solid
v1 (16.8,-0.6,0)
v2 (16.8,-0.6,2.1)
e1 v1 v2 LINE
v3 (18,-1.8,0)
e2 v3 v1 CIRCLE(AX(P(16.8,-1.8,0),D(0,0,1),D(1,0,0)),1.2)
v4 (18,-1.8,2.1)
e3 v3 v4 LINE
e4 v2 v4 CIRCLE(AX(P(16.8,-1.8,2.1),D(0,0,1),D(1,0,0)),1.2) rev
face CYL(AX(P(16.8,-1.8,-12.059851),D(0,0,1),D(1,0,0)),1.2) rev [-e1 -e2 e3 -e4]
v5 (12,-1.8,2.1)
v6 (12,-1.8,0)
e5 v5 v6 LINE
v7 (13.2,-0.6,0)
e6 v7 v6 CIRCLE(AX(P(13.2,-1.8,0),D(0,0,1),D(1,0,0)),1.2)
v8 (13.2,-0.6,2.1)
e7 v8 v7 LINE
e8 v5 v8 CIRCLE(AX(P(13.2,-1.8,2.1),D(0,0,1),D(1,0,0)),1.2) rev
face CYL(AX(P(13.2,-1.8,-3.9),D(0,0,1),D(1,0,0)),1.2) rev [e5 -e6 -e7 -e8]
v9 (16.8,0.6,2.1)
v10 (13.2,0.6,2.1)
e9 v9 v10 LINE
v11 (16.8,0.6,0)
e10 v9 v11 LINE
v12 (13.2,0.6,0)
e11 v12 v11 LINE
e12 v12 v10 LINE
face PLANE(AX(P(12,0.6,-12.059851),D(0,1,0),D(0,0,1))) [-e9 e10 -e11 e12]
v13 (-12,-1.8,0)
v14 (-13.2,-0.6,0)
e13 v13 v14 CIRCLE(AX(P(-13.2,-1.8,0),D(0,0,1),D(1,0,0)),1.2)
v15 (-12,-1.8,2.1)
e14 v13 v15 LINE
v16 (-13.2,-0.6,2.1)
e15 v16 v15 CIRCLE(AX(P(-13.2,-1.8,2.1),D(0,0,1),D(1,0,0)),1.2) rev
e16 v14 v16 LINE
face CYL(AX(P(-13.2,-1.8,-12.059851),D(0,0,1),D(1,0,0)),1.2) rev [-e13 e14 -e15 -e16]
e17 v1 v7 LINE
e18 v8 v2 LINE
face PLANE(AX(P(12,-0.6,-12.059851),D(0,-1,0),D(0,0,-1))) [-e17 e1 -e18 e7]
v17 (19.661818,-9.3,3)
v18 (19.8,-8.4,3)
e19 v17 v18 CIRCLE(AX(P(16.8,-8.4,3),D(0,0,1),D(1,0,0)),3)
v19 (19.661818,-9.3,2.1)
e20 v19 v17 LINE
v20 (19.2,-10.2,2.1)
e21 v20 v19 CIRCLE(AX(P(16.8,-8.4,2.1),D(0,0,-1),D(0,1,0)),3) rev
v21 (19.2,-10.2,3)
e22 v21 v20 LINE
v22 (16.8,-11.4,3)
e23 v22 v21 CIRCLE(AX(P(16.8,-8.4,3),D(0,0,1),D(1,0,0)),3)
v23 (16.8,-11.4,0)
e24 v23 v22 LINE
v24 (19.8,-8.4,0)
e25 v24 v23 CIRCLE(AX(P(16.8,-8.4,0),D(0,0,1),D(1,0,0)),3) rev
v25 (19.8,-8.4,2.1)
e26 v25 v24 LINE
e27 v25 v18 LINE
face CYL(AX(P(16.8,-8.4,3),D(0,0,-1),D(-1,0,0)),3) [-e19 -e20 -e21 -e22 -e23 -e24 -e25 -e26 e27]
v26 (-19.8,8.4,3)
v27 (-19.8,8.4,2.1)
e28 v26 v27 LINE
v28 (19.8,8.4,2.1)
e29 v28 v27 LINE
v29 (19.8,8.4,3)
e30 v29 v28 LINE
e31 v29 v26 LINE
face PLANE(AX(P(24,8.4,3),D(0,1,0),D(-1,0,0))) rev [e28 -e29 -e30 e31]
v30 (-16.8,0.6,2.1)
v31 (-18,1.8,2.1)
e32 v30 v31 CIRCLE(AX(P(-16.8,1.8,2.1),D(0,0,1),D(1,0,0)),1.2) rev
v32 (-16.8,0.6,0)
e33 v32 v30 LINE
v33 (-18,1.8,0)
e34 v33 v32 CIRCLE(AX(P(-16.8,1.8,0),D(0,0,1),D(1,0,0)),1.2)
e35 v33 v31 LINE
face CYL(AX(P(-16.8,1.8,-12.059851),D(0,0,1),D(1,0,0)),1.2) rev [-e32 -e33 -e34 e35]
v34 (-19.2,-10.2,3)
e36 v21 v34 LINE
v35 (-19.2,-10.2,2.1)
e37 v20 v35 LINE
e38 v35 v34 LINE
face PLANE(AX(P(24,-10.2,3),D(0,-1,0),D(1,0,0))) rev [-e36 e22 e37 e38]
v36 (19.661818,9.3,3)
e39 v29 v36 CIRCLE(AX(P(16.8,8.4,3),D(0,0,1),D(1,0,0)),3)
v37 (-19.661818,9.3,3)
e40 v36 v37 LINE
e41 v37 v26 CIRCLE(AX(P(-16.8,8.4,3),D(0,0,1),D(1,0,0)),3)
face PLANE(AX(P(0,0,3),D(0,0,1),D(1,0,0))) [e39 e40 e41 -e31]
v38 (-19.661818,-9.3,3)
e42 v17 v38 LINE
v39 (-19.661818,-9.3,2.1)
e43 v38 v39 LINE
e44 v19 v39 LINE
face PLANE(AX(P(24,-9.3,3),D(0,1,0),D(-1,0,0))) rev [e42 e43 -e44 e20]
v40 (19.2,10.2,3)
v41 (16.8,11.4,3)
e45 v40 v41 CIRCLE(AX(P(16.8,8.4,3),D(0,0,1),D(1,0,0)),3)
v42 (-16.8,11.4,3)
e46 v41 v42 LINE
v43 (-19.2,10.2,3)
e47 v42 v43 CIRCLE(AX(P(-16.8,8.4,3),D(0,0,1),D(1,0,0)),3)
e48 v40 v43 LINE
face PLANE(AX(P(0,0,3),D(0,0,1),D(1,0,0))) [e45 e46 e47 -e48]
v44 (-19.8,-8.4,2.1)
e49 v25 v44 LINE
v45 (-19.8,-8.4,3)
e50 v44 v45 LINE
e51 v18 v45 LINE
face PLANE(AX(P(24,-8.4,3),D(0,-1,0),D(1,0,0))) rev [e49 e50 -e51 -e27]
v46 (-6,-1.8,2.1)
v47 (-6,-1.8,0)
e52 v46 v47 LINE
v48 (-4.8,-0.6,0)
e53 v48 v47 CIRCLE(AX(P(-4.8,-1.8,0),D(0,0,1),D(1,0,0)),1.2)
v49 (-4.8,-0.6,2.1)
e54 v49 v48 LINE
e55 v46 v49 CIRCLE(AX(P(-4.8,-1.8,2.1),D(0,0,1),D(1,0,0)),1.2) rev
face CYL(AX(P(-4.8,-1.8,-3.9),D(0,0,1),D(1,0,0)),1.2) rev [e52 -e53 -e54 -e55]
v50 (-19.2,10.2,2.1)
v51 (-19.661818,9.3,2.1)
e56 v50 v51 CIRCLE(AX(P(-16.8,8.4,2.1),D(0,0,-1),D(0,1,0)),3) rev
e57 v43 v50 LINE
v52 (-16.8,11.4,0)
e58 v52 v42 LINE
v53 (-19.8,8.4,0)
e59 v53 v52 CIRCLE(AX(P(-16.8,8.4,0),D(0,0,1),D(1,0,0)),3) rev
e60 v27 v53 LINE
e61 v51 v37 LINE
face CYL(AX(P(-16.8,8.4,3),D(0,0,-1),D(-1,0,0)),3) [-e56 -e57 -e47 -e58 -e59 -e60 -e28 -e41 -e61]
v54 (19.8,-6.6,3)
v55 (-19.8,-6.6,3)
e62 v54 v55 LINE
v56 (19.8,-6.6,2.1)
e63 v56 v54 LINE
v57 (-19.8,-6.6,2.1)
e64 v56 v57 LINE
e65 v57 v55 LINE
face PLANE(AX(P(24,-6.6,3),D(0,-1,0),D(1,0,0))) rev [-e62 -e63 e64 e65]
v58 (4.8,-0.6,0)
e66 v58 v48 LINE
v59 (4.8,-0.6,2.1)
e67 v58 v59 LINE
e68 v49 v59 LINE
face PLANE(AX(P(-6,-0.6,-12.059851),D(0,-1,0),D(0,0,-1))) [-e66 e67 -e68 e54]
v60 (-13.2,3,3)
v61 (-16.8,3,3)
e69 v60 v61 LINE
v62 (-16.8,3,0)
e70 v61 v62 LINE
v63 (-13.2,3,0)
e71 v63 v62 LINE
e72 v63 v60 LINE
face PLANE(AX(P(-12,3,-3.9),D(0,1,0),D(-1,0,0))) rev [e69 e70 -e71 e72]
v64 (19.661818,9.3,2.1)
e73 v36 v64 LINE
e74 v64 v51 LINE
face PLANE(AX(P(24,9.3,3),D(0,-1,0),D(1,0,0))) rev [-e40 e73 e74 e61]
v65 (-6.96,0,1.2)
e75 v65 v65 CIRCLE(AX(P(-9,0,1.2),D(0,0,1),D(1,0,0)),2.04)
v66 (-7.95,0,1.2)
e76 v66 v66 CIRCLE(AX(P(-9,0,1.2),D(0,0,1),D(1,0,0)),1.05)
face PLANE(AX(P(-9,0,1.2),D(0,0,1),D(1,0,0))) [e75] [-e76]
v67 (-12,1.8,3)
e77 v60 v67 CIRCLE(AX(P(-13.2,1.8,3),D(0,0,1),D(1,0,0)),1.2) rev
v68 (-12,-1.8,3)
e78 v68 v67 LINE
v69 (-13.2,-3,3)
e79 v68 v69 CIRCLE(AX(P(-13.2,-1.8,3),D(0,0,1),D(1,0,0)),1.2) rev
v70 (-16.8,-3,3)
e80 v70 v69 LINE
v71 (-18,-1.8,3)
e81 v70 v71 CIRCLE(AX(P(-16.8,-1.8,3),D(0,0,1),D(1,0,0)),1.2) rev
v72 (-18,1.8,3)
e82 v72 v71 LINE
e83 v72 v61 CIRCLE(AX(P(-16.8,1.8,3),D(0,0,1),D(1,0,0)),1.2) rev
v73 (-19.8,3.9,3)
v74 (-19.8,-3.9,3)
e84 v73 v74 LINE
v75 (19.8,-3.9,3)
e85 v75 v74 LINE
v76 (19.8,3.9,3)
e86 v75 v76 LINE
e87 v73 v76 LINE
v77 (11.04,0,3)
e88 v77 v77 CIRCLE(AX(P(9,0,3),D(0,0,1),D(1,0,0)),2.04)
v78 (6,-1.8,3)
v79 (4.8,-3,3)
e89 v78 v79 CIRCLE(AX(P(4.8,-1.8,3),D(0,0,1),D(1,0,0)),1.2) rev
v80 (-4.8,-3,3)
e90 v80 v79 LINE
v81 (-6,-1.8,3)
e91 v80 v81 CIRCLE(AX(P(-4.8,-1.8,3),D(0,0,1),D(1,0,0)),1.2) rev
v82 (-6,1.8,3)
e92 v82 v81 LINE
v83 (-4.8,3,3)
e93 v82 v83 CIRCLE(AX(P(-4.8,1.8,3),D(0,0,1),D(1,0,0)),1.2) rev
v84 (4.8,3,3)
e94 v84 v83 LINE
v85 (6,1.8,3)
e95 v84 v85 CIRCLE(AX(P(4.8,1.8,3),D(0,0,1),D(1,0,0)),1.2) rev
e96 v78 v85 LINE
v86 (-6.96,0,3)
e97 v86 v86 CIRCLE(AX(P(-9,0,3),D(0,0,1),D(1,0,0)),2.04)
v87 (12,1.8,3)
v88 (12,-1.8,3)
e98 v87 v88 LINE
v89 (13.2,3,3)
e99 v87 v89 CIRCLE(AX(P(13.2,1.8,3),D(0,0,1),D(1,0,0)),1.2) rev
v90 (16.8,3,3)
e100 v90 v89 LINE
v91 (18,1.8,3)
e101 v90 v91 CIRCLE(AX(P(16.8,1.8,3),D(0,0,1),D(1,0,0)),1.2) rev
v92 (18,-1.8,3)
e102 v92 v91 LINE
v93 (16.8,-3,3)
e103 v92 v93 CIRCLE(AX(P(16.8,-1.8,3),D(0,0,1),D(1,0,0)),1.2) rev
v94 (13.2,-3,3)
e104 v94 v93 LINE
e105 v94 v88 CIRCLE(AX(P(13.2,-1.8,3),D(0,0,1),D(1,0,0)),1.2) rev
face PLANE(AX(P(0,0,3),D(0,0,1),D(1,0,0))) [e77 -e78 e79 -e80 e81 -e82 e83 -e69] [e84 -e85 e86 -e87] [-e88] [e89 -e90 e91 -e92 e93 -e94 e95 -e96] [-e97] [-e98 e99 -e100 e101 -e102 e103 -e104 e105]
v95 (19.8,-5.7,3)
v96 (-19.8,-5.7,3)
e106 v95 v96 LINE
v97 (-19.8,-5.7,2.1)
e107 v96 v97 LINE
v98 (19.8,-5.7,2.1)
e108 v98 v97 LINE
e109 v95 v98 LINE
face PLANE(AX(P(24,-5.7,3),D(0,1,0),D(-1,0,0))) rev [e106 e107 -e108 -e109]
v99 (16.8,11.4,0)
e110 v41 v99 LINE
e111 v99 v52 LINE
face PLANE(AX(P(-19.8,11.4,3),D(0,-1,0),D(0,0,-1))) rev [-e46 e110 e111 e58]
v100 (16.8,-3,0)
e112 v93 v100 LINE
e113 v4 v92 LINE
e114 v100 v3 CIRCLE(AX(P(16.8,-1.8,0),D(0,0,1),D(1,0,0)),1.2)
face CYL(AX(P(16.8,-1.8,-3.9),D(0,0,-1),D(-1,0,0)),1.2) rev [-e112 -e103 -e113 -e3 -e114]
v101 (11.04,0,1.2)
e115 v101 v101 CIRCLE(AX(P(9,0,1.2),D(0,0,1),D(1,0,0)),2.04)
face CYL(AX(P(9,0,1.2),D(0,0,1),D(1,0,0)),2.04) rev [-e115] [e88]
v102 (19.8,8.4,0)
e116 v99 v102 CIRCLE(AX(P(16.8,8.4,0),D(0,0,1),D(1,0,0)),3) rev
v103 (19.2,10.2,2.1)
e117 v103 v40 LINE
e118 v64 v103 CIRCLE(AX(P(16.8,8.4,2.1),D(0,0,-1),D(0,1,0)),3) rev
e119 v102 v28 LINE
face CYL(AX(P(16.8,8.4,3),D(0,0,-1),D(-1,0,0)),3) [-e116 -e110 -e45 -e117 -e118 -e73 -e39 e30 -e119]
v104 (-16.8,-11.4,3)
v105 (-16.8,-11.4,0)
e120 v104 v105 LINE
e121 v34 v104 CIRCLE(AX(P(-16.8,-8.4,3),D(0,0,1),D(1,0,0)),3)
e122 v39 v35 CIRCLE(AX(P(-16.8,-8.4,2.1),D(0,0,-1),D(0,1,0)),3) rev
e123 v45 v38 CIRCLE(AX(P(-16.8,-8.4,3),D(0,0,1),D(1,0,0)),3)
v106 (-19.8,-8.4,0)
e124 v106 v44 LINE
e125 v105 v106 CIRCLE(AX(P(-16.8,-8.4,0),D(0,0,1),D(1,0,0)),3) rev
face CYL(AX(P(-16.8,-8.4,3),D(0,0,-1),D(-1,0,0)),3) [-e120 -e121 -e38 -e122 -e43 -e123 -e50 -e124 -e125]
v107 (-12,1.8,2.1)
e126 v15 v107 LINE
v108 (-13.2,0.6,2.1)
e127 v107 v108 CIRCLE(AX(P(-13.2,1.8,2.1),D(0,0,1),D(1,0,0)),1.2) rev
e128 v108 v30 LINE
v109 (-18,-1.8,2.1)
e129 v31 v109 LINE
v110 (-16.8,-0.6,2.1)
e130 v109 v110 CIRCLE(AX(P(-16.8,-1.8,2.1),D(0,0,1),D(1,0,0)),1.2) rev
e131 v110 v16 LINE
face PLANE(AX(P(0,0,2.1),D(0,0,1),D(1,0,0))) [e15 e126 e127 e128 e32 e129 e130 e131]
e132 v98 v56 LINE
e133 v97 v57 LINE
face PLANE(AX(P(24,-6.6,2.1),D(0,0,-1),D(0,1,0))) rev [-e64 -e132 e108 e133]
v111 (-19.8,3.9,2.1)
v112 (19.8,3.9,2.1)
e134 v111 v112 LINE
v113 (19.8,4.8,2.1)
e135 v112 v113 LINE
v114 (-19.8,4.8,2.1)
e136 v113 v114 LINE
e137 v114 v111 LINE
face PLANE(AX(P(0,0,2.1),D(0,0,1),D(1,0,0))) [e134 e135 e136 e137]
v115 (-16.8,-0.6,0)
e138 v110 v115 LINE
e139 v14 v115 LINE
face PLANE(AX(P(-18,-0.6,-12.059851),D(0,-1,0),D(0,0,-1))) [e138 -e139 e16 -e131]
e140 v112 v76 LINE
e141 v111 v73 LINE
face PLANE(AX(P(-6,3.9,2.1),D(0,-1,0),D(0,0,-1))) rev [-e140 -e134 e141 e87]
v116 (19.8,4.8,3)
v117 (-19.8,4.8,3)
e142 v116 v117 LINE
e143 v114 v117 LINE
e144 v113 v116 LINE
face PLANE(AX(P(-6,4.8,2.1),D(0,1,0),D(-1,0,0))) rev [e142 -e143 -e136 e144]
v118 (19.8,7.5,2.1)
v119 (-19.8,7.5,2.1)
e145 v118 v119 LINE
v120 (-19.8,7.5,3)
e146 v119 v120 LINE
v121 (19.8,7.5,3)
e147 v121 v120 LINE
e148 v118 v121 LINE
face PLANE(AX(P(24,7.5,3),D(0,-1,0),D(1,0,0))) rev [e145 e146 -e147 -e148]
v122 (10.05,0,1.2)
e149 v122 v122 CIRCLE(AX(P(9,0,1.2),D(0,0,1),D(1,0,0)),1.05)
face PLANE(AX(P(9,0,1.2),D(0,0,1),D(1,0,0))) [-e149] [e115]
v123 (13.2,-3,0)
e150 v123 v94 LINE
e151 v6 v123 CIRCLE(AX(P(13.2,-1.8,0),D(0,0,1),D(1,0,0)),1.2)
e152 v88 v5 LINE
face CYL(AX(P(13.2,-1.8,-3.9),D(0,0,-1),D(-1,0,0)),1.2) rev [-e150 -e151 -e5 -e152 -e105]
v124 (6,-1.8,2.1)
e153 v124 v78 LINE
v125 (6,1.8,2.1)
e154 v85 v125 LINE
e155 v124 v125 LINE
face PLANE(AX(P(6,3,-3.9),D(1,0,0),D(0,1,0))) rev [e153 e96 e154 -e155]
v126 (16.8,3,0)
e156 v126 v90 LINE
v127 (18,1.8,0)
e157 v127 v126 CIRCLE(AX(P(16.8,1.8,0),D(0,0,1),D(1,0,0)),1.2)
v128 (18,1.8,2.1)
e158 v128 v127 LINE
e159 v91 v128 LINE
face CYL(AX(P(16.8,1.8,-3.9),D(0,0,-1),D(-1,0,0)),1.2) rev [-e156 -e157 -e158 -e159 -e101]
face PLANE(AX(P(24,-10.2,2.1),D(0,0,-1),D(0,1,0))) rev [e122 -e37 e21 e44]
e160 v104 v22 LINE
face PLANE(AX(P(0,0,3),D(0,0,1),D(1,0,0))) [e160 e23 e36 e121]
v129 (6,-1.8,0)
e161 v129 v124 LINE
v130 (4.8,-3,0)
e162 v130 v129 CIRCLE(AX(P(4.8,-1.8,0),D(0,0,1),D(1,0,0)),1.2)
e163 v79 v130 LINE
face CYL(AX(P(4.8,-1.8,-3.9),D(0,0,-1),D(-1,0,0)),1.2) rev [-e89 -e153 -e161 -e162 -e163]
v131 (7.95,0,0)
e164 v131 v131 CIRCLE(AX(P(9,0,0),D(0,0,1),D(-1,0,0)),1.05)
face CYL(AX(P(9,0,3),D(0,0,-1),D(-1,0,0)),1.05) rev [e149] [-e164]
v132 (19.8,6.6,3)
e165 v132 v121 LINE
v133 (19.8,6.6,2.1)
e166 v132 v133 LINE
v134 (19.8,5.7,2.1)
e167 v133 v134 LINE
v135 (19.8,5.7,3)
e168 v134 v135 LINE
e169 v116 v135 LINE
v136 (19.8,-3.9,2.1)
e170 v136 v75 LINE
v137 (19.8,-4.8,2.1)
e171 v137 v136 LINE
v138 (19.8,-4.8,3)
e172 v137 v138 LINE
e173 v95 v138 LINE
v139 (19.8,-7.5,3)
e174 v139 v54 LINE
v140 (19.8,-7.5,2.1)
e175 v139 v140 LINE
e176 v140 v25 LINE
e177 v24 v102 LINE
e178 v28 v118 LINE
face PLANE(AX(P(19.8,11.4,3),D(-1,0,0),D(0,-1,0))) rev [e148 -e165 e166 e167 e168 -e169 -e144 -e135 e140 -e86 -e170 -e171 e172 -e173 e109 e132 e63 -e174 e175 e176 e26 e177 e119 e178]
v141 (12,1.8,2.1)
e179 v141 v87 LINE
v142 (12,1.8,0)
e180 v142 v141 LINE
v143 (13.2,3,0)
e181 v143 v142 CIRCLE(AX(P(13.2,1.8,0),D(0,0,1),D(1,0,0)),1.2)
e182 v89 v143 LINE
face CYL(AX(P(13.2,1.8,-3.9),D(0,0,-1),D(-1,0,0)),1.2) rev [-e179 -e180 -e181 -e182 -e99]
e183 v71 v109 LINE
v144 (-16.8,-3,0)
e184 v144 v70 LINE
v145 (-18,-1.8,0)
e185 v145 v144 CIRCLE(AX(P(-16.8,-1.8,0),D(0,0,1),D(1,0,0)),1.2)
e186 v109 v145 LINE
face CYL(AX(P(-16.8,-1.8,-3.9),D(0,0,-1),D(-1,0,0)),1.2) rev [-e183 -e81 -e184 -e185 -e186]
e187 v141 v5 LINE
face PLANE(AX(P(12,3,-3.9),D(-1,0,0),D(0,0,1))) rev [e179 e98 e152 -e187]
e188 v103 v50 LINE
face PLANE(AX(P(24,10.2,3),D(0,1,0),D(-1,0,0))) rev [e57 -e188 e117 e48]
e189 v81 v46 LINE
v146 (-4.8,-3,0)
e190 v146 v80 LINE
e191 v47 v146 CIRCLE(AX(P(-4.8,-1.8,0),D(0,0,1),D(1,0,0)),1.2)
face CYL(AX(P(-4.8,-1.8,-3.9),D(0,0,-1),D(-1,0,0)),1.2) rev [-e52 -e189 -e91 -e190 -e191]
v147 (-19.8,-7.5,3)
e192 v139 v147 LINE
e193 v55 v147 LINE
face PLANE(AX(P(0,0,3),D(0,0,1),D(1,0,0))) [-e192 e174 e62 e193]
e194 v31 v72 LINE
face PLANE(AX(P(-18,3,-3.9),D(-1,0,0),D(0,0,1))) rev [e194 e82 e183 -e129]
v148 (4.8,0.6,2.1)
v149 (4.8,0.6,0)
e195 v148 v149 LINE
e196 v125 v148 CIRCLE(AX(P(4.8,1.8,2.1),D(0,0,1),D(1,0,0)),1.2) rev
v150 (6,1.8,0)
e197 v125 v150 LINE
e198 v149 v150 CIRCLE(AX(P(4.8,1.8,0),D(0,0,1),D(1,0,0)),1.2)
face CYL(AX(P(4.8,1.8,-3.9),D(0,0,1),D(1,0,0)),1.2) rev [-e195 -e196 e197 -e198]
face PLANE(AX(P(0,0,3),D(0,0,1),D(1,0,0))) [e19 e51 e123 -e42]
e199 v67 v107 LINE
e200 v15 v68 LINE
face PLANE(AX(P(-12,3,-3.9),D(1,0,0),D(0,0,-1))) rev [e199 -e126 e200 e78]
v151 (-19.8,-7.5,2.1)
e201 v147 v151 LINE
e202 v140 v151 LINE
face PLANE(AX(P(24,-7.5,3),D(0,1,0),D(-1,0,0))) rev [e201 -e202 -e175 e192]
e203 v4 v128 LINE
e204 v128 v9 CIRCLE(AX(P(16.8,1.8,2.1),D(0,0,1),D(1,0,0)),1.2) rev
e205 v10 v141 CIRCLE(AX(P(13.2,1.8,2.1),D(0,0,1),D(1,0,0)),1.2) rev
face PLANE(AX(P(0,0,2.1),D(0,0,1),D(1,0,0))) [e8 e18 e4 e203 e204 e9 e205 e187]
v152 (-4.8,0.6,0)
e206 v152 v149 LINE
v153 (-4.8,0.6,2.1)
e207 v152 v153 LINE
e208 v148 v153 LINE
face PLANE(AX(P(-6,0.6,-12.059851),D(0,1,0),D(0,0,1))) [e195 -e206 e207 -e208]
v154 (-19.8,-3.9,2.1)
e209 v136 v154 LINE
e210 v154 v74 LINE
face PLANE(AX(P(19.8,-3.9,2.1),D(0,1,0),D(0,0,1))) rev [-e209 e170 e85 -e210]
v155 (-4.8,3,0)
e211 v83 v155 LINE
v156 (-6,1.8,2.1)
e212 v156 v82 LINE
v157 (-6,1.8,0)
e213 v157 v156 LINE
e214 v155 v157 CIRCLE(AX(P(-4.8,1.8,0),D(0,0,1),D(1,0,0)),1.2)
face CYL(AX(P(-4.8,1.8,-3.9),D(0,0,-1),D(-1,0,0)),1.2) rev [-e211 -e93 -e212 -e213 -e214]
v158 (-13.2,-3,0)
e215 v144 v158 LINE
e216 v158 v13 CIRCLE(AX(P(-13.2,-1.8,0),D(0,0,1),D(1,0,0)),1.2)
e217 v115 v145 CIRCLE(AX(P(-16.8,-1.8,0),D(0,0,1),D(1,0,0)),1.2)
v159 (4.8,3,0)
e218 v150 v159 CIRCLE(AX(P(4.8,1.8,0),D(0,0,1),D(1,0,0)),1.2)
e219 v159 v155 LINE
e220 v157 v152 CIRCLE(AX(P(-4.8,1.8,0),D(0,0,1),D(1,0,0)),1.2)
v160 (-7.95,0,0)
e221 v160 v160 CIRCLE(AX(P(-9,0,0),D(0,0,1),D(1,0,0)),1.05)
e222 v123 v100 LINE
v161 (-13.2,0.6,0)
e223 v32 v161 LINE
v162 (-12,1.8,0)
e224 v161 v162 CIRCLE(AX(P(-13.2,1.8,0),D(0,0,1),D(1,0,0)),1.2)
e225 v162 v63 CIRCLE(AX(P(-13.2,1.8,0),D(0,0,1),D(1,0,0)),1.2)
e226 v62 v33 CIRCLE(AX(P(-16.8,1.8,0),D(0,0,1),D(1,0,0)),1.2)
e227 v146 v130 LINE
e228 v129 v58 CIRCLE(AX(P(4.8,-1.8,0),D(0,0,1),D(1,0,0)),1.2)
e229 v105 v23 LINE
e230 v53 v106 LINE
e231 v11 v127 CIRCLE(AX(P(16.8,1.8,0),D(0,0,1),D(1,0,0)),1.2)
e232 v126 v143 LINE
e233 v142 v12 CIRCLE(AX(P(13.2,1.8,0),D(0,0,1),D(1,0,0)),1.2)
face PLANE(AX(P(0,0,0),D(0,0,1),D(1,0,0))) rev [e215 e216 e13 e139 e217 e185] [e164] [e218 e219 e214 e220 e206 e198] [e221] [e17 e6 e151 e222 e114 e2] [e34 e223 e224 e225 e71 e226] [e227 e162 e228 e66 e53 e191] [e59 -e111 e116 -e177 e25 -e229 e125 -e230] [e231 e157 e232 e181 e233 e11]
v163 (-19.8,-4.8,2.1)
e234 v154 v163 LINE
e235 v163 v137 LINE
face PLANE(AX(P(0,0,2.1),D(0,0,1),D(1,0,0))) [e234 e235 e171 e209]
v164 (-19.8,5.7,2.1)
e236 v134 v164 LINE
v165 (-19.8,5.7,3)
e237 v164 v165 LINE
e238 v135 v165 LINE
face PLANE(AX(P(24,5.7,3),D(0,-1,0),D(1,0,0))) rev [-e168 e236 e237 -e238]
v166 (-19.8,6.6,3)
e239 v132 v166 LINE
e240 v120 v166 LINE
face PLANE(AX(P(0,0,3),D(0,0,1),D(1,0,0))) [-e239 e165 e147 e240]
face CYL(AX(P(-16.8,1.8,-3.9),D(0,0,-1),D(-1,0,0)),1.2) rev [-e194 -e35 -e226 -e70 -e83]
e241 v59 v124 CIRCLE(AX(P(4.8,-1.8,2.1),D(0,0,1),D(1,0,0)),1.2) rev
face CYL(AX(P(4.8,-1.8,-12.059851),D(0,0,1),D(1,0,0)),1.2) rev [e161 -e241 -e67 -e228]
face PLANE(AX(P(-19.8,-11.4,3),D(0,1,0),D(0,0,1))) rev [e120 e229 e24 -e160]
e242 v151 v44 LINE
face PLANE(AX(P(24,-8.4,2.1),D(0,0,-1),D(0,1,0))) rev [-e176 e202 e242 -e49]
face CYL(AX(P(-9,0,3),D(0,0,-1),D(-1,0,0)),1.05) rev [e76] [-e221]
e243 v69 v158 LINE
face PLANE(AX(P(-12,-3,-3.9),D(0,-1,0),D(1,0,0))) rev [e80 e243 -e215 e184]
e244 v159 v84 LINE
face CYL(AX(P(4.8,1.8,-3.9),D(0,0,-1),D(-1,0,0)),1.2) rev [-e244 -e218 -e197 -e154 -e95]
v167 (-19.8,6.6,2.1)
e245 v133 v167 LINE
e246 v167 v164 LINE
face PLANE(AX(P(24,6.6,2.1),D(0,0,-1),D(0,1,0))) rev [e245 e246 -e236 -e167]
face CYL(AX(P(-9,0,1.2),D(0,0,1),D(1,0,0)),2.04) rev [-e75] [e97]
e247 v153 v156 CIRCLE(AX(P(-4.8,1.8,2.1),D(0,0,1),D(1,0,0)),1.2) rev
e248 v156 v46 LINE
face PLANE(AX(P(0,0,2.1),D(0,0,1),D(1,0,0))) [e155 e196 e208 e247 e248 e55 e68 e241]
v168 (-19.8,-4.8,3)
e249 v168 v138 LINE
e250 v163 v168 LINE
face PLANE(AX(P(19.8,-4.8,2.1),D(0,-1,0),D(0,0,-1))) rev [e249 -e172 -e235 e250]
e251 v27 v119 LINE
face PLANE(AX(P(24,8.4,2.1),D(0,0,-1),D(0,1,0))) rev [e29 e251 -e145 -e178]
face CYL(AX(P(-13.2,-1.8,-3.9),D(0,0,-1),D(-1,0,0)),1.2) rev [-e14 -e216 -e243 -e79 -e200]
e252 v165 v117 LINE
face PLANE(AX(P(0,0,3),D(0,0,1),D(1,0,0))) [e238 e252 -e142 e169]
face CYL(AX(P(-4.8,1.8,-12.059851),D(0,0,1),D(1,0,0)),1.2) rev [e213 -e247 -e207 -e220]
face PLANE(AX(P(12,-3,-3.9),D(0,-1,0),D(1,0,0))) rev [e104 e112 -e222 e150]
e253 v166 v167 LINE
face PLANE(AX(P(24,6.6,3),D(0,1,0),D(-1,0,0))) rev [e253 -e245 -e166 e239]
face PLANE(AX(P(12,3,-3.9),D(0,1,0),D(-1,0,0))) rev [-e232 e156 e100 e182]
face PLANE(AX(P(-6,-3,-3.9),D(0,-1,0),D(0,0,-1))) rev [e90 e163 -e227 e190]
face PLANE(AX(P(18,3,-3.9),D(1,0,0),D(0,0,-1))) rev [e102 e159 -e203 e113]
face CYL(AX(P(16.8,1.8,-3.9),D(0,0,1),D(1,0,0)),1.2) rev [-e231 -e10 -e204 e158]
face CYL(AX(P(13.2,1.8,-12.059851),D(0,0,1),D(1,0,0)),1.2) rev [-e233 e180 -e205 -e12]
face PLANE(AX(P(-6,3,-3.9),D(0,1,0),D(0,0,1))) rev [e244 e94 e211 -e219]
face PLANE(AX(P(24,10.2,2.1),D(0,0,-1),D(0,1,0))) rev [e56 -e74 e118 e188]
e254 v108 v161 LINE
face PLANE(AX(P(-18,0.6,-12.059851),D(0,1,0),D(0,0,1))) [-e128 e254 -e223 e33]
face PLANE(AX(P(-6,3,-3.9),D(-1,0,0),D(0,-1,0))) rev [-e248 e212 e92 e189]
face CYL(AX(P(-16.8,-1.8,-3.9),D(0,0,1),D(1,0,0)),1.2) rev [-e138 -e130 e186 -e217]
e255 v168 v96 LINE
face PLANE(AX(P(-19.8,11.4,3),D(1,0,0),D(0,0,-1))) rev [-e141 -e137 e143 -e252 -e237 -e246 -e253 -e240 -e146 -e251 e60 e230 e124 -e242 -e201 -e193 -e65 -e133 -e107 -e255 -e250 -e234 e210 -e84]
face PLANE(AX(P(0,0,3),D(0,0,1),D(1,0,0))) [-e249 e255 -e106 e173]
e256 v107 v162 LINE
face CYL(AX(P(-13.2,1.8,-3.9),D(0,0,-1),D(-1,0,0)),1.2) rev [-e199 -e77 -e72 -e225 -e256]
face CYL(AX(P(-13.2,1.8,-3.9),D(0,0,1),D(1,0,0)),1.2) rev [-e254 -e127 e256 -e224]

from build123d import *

# Parameters (mm, degrees)
SKETCH_1_W          = 66
SKETCH_1_H          = 38
SKETCH_1_R          = 1.75
EXTRUDE_1_DEPTH     = 5
SKETCH_2_R          = 3.4
CUT_EXTRUDE_1_DEPTH = 3
SKETCH_3_W          = 1.5
SKETCH_3_H          = 1.5
CUT_EXTRUDE_2_DEPTH = 73
SKETCH_4_W          = 10
SKETCH_4_H          = 1.5
SKETCH_4_W_2        = 20
CUT_EXTRUDE_3_DEPTH = 1.5
FILLET_1_R          = 5
SKETCH_5_W          = 13
SKETCH_5_H          = 1.5
CUT_EXTRUDE_4_DEPTH = 1.5
SKETCH_6_W          = 20
SKETCH_6_H          = 10
SKETCH_6_W_2        = 10
CUT_EXTRUDE_5_DEPTH = 11.5
FILLET_2_R          = 2
SKETCH_7_W          = 10
SKETCH_7_H          = 2
SKETCH_7_W_2        = 20
EXTRUDE_2_DEPTH     = 5
SKETCH_8_W          = 10
SKETCH_8_H          = 2
SKETCH_8_W_2        = 20
CUT_EXTRUDE_6_DEPTH = 1.5
FILLET_3_R          = 2
SCALE_1_SCALE       = 0.6


with BuildPart() as part:
    # 草图1 → 凸台-拉伸1 (new body)
    with BuildSketch(Plane.XY):
        Rectangle(SKETCH_1_W, SKETCH_1_H)
        with Locations((-15, 0)):
            Circle(SKETCH_1_R, mode=Mode.SUBTRACT)
        with Locations(Location((15, 0, 0), (0, 0, 180))):
            Circle(SKETCH_1_R, mode=Mode.SUBTRACT)
    extrude(amount=EXTRUDE_1_DEPTH)

    # 草图2 → 切除-拉伸1 (cut)
    with BuildSketch(Plane.XY.offset(5)):
        with Locations((-15, 0)):
            Circle(SKETCH_2_R)
        with Locations((15, 0)):
            Circle(SKETCH_2_R)
    extrude(amount=-CUT_EXTRUDE_1_DEPTH, mode=Mode.SUBTRACT)

    # 草图3 → 切除-拉伸2 (cut)
    with BuildSketch(Plane.ZY.offset(33)):
        with Locations((4.25, 16.25)):
            Rectangle(SKETCH_3_W, SKETCH_3_H)
        with Locations((4.25, 13.25)):
            Rectangle(SKETCH_3_W, SKETCH_3_H)
        with Locations((4.25, 10.25)):
            Rectangle(SKETCH_3_W, SKETCH_3_H)
        with Locations((4.25, -10.25)):
            Rectangle(SKETCH_3_W, SKETCH_3_H)
        with Locations((4.25, -13.25)):
            Rectangle(SKETCH_3_W, SKETCH_3_H)
        with Locations((4.25, -16.25)):
            Rectangle(SKETCH_3_W, SKETCH_3_H)
    extrude(amount=-CUT_EXTRUDE_2_DEPTH, mode=Mode.SUBTRACT)

    # 草图4 → 切除-拉伸3 (cut)
    with BuildSketch(Plane.XY.offset(5)):
        with Locations((-28, 7.25)):
            Rectangle(SKETCH_4_W, SKETCH_4_H)
        with Locations((-28, -7.25)):
            Rectangle(SKETCH_4_W, SKETCH_4_H)
        with Locations((0, 7.25)):
            Rectangle(SKETCH_4_W_2, SKETCH_4_H)
        with Locations((0, -7.25)):
            Rectangle(SKETCH_4_W_2, SKETCH_4_H)
        with Locations((28, -7.25)):
            Rectangle(SKETCH_4_W, SKETCH_4_H)
        with Locations((28, 7.25)):
            Rectangle(SKETCH_4_W, SKETCH_4_H)
    extrude(amount=-CUT_EXTRUDE_3_DEPTH, mode=Mode.SUBTRACT)

    # 圆角1
    fillet_1_edges = [part.edges().sort_by_distance(p)[0] for p in [
        (33, -19, 2.5),
        (-33, -19, 2.5),
        (33, 19, 2.5),
        (-33, 19, 2.5),
    ]]
    fillet(fillet_1_edges, radius=FILLET_1_R - 0.0001)  # a hair under: the kernel refuses the full size

    # 草图5 → 切除-拉伸4 (cut)
    with BuildSketch(Plane.XY.offset(5)):
        with Locations((-16.5, 7.25)):
            Rectangle(SKETCH_5_W, SKETCH_5_H)
        with Locations((16.5, 7.25)):
            Rectangle(SKETCH_5_W, SKETCH_5_H)
        with Locations((-16.5, -7.25)):
            Rectangle(SKETCH_5_W, SKETCH_5_H)
        with Locations((16.5, -7.25)):
            Rectangle(SKETCH_5_W, SKETCH_5_H)
    extrude(amount=-CUT_EXTRUDE_4_DEPTH, mode=Mode.SUBTRACT)

    # 草图6 → 切除-拉伸5 (cut)
    with BuildSketch(Plane.XY.offset(5)):
        Rectangle(SKETCH_6_W, SKETCH_6_H)
        with Locations((25, 0)):
            Rectangle(SKETCH_6_W_2, SKETCH_6_H)
        with Locations((-25, 0)):
            Rectangle(SKETCH_6_W_2, SKETCH_6_H)
    extrude(amount=-CUT_EXTRUDE_5_DEPTH, mode=Mode.SUBTRACT)

    # 圆角2
    fillet_2_edges = [part.edges().sort_by_distance(p)[0] for p in [
        (-30, 5, 2.5),
        (-20, 5, 2.5),
        (-20, -5, 2.5),
        (-30, -5, 2.5),
        (20, -5, 2.5),
        (20, 5, 2.5),
        (30, 5, 2.5),
        (30, -5, 2.5),
        (-10, -5, 2.5),
        (-10, 5, 2.5),
        (10, 5, 2.5),
        (10, -5, 2.5),
    ]]
    fillet(fillet_2_edges, radius=FILLET_2_R)

    # 草图7 → 凸台-拉伸2 (add)
    with BuildSketch(Plane.XY.offset(5)):
        with Locations((-25, 0)):
            Rectangle(SKETCH_7_W, SKETCH_7_H)
        Rectangle(SKETCH_7_W_2, SKETCH_7_H)
        with Locations((25, 0)):
            Rectangle(SKETCH_7_W, SKETCH_7_H)
    extrude(amount=-EXTRUDE_2_DEPTH)

    # 草图8 → 切除-拉伸6 (cut)
    with BuildSketch(Plane.XY.offset(5)):
        with Locations((-25, 0)):
            Rectangle(SKETCH_8_W, SKETCH_8_H)
        Rectangle(SKETCH_8_W_2, SKETCH_8_H)
        with Locations((25, 0)):
            Rectangle(SKETCH_8_W, SKETCH_8_H)
    extrude(amount=-CUT_EXTRUDE_6_DEPTH, mode=Mode.SUBTRACT)

    # 圆角3
    fillet_3_edges = [part.edges().sort_by_distance(p)[0] for p in [
        (30, -1, 1.75),
        (30, 1, 1.75),
        (20, -1, 1.75),
        (20, 1, 1.75),
        (10, -1, 1.75),
        (10, 1, 1.75),
        (-10, -1, 1.75),
        (-10, 1, 1.75),
        (-30, -1, 1.75),
        (-20, -1, 1.75),
        (-20, 1, 1.75),
        (-30, 1, 1.75),
    ]]
    fillet(fillet_3_edges, radius=FILLET_3_R - 0.0001)  # a hair under: the kernel refuses the full size


with BuildPart() as part_1:
    # 缩放比例1: scaled about (0, 0, 0)
    add(part.part.scale(SCALE_1_SCALE))


solid = part_1.part
